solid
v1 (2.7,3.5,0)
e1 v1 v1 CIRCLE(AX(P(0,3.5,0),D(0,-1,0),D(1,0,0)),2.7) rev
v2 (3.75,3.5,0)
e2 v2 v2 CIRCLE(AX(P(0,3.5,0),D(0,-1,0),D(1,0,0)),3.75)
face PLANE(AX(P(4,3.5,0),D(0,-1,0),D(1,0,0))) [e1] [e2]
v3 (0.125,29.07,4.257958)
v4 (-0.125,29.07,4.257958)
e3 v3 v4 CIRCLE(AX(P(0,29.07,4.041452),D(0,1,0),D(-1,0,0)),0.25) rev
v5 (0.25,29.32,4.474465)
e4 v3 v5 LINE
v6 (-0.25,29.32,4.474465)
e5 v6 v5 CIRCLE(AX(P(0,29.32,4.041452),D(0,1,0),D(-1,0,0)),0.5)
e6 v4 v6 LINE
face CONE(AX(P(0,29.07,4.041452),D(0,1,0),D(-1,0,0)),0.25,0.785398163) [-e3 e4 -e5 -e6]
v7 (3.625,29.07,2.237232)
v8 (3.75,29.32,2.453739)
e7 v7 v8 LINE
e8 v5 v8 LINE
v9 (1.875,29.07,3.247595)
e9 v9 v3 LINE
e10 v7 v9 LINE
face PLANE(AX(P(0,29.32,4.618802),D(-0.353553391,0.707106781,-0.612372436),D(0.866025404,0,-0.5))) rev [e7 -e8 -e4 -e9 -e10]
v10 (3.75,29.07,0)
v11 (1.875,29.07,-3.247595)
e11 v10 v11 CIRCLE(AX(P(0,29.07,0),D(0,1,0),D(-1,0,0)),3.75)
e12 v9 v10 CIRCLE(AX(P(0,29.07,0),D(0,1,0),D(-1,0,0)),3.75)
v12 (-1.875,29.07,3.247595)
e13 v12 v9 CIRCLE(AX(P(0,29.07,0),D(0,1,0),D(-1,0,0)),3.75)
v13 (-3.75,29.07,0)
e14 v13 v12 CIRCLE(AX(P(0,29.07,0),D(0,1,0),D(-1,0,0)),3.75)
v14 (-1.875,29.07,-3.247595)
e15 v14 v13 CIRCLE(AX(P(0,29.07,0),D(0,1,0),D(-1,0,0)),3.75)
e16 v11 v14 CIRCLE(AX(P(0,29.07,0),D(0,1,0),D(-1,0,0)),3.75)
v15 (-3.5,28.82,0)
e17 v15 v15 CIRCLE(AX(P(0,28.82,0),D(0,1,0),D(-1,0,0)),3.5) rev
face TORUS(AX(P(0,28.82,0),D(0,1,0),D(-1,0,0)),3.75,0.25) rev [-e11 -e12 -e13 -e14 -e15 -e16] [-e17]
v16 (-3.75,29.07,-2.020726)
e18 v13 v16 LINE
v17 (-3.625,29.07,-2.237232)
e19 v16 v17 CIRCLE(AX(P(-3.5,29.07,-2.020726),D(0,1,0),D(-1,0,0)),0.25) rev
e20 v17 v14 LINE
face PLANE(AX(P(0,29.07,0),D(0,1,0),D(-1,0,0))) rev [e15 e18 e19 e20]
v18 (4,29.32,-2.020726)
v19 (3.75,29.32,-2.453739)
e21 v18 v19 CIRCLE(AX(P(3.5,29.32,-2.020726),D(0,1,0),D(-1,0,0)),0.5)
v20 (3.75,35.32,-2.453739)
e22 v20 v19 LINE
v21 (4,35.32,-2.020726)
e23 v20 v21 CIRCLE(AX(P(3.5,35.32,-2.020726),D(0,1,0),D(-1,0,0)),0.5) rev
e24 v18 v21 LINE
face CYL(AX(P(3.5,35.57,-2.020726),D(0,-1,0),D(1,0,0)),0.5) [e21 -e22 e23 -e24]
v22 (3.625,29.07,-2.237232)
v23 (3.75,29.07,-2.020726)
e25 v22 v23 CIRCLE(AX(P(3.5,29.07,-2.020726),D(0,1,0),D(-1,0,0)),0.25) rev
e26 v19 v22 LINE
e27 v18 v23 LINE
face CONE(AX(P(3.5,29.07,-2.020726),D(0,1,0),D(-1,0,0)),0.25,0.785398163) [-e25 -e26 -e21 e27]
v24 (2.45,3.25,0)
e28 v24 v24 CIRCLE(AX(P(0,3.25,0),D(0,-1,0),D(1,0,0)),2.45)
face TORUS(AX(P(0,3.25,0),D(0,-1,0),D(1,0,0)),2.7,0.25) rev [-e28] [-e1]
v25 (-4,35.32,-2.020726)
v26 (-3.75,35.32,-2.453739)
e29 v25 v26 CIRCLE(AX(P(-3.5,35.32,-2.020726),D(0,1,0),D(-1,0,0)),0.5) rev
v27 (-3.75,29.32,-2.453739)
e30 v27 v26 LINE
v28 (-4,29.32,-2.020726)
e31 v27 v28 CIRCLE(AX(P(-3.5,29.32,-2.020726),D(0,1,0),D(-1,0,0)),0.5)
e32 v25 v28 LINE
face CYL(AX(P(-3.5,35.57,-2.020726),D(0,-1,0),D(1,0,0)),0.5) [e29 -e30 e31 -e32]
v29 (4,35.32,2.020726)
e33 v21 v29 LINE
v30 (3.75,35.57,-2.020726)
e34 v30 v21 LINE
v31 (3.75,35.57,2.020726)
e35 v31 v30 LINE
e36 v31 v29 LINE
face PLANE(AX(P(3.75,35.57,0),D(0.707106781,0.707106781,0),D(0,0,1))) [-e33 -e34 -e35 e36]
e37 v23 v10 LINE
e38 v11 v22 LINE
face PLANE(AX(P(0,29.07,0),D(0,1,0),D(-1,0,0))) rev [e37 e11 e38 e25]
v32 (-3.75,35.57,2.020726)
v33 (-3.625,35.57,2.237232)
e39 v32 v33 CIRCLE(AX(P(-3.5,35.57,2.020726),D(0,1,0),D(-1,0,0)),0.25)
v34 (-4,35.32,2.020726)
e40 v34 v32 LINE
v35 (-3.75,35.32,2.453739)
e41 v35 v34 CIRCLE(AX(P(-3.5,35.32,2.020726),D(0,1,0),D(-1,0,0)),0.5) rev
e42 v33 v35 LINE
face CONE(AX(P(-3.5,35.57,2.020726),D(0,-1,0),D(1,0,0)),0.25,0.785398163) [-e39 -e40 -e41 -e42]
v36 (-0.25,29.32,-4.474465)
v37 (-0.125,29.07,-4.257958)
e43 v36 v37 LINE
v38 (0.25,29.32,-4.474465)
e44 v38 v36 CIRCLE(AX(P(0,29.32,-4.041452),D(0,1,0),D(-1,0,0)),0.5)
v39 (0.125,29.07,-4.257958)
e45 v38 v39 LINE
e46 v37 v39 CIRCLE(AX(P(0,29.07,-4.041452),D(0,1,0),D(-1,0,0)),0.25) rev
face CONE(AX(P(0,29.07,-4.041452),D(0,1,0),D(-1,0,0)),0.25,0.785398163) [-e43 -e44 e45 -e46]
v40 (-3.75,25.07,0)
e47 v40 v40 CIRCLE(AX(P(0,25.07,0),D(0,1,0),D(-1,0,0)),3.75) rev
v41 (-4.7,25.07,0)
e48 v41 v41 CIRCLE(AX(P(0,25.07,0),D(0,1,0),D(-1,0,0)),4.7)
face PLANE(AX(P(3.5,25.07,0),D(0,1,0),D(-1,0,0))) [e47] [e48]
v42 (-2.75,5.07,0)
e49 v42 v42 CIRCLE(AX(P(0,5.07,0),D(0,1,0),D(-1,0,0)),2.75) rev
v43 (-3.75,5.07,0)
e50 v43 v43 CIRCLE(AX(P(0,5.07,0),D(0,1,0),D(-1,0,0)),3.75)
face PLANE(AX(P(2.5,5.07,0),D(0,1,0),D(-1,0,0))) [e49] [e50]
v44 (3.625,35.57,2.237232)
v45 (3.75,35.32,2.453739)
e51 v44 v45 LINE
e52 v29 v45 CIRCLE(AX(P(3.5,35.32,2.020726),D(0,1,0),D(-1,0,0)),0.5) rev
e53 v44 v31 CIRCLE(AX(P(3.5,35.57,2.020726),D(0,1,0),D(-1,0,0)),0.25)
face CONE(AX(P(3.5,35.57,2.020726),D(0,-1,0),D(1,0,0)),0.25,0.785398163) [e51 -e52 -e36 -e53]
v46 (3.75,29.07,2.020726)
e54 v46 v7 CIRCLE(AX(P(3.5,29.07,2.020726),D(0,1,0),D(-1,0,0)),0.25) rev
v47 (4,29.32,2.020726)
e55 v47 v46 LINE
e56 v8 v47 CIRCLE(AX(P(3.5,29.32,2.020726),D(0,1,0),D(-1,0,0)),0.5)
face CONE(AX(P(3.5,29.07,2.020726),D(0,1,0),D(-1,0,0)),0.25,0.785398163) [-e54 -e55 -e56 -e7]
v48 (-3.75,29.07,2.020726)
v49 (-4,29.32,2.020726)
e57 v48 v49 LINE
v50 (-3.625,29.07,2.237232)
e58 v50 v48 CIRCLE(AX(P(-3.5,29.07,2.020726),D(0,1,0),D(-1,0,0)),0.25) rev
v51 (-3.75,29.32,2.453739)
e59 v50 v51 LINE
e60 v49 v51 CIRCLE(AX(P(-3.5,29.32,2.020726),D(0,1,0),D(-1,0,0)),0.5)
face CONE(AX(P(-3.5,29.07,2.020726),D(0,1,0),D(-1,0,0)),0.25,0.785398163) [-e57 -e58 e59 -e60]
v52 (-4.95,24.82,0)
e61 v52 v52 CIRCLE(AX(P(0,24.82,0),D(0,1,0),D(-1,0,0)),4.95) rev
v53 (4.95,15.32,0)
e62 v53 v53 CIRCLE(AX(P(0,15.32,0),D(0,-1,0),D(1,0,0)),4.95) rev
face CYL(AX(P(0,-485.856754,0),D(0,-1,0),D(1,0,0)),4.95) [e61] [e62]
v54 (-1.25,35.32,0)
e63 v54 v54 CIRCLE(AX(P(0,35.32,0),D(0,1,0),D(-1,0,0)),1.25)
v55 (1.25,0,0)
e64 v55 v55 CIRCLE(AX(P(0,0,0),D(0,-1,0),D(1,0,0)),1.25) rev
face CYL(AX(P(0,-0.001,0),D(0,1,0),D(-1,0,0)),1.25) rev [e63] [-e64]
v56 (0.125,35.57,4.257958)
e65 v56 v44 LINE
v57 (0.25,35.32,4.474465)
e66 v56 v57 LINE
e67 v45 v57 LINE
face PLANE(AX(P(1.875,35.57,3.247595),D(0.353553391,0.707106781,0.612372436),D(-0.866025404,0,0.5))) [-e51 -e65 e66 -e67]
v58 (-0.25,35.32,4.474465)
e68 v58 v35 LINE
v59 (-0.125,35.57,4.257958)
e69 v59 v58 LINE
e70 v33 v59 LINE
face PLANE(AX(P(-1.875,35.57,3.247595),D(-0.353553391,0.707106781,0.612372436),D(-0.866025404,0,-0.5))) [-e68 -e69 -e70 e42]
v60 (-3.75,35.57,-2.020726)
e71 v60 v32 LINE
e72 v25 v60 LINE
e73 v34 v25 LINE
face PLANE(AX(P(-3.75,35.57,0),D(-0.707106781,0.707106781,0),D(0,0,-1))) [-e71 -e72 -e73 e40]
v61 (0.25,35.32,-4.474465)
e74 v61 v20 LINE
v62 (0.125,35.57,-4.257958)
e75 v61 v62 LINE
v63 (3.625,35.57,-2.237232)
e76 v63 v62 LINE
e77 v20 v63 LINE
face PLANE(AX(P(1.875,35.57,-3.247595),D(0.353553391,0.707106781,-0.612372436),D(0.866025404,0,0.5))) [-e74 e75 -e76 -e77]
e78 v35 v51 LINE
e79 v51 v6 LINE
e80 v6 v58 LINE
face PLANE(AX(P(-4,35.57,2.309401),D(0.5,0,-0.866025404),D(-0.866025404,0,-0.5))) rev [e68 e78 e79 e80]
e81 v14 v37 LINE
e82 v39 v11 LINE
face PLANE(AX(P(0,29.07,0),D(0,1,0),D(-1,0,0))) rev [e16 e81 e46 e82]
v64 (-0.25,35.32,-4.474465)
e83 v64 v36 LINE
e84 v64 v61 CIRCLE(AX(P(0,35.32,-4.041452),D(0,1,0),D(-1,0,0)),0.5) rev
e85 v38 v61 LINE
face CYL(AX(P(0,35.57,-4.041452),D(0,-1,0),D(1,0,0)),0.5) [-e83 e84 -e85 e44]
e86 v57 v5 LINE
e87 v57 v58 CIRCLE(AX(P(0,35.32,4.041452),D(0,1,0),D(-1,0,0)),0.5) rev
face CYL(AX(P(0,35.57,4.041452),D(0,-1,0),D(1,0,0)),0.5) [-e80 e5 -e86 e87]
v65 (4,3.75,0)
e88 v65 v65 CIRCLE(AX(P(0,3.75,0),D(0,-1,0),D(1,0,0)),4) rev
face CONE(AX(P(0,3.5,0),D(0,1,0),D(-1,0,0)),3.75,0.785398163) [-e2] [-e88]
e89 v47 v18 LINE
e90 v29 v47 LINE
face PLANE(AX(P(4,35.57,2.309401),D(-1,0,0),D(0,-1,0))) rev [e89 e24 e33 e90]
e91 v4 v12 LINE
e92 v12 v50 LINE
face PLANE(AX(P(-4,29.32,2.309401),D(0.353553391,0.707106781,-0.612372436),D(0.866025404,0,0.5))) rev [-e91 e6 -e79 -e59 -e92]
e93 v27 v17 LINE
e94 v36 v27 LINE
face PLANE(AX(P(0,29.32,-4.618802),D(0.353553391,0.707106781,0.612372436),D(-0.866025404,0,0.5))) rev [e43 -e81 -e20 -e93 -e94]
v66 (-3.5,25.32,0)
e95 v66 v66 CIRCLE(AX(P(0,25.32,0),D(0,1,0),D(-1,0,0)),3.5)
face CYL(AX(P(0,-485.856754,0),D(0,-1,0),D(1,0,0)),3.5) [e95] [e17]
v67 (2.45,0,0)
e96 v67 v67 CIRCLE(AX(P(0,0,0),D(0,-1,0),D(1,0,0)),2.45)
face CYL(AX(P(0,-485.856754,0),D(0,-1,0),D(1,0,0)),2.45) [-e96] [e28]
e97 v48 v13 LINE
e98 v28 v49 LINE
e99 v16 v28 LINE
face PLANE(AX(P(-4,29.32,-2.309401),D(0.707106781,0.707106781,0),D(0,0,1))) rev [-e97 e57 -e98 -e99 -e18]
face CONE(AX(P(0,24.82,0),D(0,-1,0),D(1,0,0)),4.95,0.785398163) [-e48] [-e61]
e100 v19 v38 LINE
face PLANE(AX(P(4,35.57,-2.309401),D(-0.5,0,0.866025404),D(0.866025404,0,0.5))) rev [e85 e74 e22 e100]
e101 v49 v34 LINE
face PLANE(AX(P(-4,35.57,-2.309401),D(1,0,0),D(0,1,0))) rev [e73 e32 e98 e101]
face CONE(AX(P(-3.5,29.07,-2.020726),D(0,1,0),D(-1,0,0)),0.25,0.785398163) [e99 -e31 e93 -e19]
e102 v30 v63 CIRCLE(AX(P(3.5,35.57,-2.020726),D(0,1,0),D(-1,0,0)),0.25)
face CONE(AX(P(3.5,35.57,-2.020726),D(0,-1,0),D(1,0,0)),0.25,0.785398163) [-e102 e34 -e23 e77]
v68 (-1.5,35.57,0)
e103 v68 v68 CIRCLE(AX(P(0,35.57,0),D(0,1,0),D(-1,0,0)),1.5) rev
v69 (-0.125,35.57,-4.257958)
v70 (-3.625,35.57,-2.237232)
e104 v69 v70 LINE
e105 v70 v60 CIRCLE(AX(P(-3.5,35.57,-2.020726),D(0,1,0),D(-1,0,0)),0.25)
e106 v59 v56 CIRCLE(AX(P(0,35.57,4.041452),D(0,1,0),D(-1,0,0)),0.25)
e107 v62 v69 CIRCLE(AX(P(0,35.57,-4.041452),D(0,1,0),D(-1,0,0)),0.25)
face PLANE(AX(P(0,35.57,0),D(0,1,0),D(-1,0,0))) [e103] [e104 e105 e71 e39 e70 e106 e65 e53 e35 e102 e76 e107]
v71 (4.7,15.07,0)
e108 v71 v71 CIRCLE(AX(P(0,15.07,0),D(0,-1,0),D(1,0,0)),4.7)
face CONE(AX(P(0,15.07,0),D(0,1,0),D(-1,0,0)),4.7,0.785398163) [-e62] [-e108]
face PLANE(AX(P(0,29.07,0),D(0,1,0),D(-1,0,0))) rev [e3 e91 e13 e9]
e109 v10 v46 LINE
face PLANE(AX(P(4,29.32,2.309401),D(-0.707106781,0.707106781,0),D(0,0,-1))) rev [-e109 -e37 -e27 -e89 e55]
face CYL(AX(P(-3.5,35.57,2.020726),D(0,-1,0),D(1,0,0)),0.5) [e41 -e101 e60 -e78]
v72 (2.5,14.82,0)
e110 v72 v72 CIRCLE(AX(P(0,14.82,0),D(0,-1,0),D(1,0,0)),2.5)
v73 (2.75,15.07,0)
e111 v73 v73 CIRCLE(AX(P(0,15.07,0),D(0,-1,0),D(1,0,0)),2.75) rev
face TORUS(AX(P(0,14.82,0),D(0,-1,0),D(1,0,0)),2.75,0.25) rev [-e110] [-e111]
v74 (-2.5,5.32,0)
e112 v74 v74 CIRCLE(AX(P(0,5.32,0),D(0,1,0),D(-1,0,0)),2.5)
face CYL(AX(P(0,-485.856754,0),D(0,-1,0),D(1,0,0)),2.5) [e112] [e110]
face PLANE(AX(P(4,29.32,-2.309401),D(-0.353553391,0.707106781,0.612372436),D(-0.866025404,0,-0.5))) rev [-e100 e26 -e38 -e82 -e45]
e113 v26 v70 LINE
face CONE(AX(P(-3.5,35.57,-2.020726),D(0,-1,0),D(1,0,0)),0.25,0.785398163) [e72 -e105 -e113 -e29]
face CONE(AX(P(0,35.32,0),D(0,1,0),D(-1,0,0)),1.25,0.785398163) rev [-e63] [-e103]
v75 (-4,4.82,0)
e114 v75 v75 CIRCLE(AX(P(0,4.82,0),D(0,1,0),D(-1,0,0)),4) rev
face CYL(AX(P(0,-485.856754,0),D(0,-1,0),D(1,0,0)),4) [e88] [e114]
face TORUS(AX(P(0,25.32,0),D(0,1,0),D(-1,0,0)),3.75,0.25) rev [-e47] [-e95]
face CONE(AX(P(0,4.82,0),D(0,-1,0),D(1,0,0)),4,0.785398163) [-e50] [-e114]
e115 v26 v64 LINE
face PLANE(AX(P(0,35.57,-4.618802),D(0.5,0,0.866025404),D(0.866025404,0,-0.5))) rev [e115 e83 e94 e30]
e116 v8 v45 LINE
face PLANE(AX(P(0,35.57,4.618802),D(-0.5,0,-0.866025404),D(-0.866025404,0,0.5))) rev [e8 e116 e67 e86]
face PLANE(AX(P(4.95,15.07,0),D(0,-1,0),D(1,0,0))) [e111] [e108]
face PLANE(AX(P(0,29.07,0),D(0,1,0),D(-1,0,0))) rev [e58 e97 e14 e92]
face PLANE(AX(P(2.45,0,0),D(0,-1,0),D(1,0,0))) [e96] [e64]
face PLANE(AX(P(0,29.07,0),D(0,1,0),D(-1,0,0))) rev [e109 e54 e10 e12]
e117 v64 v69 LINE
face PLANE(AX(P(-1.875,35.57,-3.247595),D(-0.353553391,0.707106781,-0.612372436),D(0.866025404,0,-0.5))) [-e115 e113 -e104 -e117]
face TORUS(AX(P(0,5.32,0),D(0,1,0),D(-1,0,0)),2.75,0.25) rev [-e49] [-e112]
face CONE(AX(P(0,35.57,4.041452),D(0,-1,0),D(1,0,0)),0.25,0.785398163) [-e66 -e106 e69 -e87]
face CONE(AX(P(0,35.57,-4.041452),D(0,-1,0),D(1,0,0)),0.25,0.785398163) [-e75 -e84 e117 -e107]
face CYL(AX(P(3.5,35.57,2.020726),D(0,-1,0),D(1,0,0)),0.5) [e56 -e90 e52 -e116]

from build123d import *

# Parameters (mm, degrees)
CHAMFER1_SIZE       = 0.25
FILLET1_R           = 0.25
BOSS_EXTRUDE1_DEPTH = 6.5
CUT_EXTRUDE1_REACH  = 38.252
SKETCH3_R           = 1.25
FILLET2_R           = 0.5
FILLET3_R           = 0.25
CHAMFER2_SIZE       = 0.25


with BuildPart() as part:
    # Sketch1 → Revolve1 (revolve)
    with BuildSketch(Plane.XY):
        Polygon((0, 29.07), (3.5, 29.07), (3.5, 25.07), (4.95, 25.07), (4.95, 15.07), (2.5, 15.07), (2.5, 5.07), (4, 5.07), (4, 3.5), (2.45, 3.5), (2.45, 0), (0, 0), align=None)
    revolve(axis=Axis((0, -485.856754354, 0), (0, 1, 0)))

    # Chamfer1
    chamfer1_edges = [part.edges().sort_by_distance(p)[0] for p in [
        (-4, 3.5, 0),
        (-4, 5.07, 0),
        (-4.95, 15.07, 0),
        (-4.95, 25.07, 0),
    ]]
    chamfer(chamfer1_edges, length=CHAMFER1_SIZE)

    # Fillet1
    fillet1_edges = [part.edges().sort_by_distance(p)[0] for p in [
        (-2.45, 3.5, 0),
        (-2.5, 5.07, 0),
        (-2.5, 15.07, 0),
        (-3.5, 25.07, 0),
    ]]
    fillet(fillet1_edges, radius=FILLET1_R)

    # Sketch2 → Boss-Extrude1 (add)
    with BuildSketch(Plane(origin=(0, 29.07, 0), x_dir=(1, 0, 0), z_dir=(0, 1, 0))):
        Polygon((4, 2.309401077), (0, 4.618802154), (-4, 2.309401077), (-4, -2.309401077), (0, -4.618802154), (4, -2.309401077), align=None)
    extrude(amount=BOSS_EXTRUDE1_DEPTH)

    # Sketch3 → Cut-Extrude1 (cut, up to next)
    with BuildSketch(Plane(origin=(0, 35.57, 0), x_dir=(1, 0, 0), z_dir=(0, 1, 0)), mode=Mode.PRIVATE) as cut_extrude1_sk1:
        with Locations(Location((0, 0, 0), (0, 0, 180))):
            Circle(SKETCH3_R)
    cut_extrude1_tool1 = extrude(cut_extrude1_sk1.sketch, amount=-CUT_EXTRUDE1_REACH, mode=Mode.PRIVATE) & part.part
    add(cut_extrude1_tool1.solids().sort_by_distance((0, 35.57, 0))[0], mode=Mode.SUBTRACT)

    # Fillet2
    fillet2_edges = [part.edges().sort_by_distance(p)[0] for p in [
        (4, 32.32, 2.309401077),
        (4, 32.32, -2.309401077),
        (0, 32.32, -4.618802154),
        (-4, 32.32, -2.309401077),
        (-4, 32.32, 2.309401077),
        (0, 32.32, 4.618802154),
    ]]
    fillet(fillet2_edges, radius=FILLET2_R)

    # Fillet3
    fillet3_edges = [part.edges().sort_by_distance(p)[0] for p in [
        (-3.5, 29.07, 0),
    ]]
    fillet(fillet3_edges, radius=FILLET3_R)

    # Chamfer2
    chamfer2_edges = [part.edges().sort_by_distance(p)[0] for p in [
        (1.25, 35.57, 0),
        (-2, 29.07, -3.464101615),
        (-2, 35.57, -3.464101615),
        (4, 29.07, 0),
        (2, 29.07, 3.464101615),
        (-2, 29.07, 3.464101615),
        (-4, 29.07, 0),
        (2, 29.07, -3.464101615),
        (0, 29.07, 4.541451884),
        (-3.933012702, 29.07, 2.270725942),
        (3.933012702, 29.07, 2.270725942),
        (3.933012702, 29.07, -2.270725942),
        (-3.933012702, 29.07, -2.270725942),
        (0, 29.07, -4.541451884),
        (2, 35.57, -3.464101615),
        (4, 35.57, 0),
        (-4, 35.57, 0),
        (-2, 35.57, 3.464101615),
        (2, 35.57, 3.464101615),
        (0, 35.57, 4.541451884),
        (-3.933012702, 35.57, 2.270725942),
        (3.933012702, 35.57, 2.270725942),
        (3.933012702, 35.57, -2.270725942),
        (-3.933012702, 35.57, -2.270725942),
        (0, 35.57, -4.541451884),
    ]]
    chamfer(chamfer2_edges, length=CHAMFER2_SIZE - 0.0001)  # a hair under: the kernel refuses the full size


solid = part.part
